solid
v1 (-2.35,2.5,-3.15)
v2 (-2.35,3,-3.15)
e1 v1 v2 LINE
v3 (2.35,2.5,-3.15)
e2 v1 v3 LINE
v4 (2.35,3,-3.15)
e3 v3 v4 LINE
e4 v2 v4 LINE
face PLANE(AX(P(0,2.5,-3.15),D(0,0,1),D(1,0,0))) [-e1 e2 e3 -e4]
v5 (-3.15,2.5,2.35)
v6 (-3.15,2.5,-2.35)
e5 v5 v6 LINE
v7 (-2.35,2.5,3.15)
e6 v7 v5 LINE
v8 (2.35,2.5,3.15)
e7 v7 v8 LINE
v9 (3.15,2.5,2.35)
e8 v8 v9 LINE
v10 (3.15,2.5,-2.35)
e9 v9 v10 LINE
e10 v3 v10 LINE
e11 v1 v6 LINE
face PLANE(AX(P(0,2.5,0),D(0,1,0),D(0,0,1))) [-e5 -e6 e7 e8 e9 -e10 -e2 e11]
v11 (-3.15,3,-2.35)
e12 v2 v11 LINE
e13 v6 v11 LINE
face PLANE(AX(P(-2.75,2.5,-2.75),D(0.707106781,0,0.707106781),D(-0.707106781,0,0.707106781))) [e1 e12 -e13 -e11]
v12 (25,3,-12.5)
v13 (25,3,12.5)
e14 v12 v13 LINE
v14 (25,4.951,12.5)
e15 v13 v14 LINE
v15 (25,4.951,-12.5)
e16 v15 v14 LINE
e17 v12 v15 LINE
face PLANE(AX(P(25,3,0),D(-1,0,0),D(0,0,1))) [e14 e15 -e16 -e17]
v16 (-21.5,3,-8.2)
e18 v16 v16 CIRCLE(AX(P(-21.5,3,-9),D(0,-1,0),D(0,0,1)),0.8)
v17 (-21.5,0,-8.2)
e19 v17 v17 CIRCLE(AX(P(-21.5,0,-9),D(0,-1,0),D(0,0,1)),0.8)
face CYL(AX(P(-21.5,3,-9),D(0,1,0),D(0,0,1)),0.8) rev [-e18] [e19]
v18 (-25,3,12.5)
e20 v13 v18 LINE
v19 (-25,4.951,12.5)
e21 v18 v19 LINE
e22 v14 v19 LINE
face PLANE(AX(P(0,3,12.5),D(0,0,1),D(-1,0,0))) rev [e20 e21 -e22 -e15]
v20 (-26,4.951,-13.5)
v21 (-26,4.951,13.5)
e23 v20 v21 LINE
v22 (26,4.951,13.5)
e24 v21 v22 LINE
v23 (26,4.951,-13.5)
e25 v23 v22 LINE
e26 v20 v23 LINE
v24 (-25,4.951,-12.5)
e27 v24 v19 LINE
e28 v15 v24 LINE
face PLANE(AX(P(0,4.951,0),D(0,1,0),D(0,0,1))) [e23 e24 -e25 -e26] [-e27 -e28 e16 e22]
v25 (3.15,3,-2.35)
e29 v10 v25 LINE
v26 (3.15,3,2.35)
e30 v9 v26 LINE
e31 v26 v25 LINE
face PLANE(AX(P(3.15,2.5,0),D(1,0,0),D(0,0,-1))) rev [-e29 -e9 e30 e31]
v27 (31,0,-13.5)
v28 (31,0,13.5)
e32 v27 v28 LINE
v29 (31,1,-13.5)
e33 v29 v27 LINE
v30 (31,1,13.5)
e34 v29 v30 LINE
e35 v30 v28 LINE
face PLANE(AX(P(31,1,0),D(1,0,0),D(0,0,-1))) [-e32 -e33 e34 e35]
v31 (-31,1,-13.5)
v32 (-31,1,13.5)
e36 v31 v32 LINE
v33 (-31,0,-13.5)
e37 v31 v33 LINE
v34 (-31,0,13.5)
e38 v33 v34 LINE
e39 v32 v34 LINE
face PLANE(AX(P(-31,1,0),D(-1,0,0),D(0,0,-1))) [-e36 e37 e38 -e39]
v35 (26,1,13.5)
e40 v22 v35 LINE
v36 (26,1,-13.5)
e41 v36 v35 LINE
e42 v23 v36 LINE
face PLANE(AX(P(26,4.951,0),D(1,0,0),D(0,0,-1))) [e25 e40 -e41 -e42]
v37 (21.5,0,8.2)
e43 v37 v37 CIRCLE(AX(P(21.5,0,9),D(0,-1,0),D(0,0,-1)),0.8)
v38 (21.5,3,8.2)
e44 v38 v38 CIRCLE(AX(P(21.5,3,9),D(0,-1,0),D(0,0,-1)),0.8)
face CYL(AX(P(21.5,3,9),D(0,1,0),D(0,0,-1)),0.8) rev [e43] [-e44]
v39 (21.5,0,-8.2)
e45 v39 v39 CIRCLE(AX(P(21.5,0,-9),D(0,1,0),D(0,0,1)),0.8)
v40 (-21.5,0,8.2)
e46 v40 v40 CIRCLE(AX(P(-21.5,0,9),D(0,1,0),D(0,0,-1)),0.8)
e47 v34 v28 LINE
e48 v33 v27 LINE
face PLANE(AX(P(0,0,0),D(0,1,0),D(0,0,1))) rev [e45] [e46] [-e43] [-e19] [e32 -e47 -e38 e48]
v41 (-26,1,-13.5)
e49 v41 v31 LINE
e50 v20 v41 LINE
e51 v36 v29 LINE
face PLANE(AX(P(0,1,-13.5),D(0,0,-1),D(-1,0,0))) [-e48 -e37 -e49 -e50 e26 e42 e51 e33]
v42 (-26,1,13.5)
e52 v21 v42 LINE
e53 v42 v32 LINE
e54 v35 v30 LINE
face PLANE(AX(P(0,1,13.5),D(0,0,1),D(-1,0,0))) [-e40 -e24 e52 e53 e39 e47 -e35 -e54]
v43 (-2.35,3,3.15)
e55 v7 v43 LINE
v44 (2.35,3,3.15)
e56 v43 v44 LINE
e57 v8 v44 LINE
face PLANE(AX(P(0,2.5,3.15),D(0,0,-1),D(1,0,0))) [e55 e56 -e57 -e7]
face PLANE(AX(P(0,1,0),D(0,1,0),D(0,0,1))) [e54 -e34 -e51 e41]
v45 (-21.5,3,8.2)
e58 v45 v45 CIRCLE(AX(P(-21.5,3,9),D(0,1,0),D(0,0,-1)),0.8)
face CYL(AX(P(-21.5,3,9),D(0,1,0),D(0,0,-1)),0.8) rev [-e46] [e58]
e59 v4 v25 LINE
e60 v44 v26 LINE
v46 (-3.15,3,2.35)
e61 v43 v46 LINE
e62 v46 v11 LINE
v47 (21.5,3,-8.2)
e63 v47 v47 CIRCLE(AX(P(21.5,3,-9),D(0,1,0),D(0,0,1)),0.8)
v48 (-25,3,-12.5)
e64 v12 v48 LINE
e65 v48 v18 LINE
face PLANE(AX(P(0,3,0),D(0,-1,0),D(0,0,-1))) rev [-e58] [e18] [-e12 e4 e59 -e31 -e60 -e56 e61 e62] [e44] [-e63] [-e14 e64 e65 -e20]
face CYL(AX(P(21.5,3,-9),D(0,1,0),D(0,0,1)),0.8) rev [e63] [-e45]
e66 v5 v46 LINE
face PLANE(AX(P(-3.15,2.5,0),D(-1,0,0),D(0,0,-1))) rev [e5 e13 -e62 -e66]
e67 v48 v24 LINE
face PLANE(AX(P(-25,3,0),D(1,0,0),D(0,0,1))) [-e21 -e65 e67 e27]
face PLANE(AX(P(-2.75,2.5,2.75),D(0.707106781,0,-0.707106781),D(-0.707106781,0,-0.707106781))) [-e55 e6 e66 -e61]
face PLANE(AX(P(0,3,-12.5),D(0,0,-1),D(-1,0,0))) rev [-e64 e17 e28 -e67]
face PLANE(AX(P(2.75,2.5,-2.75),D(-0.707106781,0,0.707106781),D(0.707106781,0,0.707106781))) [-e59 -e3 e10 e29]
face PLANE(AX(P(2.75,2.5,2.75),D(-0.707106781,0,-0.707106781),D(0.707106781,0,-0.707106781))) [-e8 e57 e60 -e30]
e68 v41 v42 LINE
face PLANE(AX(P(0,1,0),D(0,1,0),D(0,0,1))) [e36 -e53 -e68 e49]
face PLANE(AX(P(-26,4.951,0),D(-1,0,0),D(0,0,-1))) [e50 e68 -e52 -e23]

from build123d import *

# Parameters (mm, degrees)
SKETCH2_W           = 5
SKETCH2_H           = 13.5
BOSS_EXTRUDE3_DEPTH = 1
SKETCH2_7_W         = 26
SKETCH2_7_H         = 13.5
BOSS_EXTRUDE6_DEPTH = 4.951
CUT_EXTRUDE2_START  = 4.951
CUT_EXTRUDE2_DEPTH  = 1.951
CUT_EXTRUDE3_START  = 3
CUT_EXTRUDE3_DEPTH  = 0.5
M2_TAPPED_HOLE1_D   = 1.6
BOX_OUTLINE_R       = 0.8
BOX_DEPTH           = 3
BOX_2_OUTLINE_W     = 5
BOX_2_OUTLINE_H     = 13.5
BOX_2_OUTLINE_H_2   = 27
BOX_2_DEPTH         = 1
BOX_START           = 3
BOX_3_DEPTH         = 1.951
BOX_START_2         = 1
BOX_4_DEPTH         = 1.5


# Read off the part's stored shape, not the designer's step: box
with BuildPart() as part:
    # Sketch2 → Boss-Extrude3 (new body)
    with BuildSketch(Plane(origin=(0, 0, 0), x_dir=(1, 0, 0), z_dir=(0, 1, 0))):
        with Locations((28.5, 6.75)):
            Rectangle(SKETCH2_W, SKETCH2_H)
    extrude(amount=BOSS_EXTRUDE3_DEPTH)

    # Sketch2<7> → Boss-Extrude6 (add)
    with BuildSketch(Plane(origin=(0, 0, 0), x_dir=(1, 0, 0), z_dir=(0, 1, 0))):
        with Locations((13, 6.75)):
            Rectangle(SKETCH2_7_W, SKETCH2_7_H)
    extrude(amount=BOSS_EXTRUDE6_DEPTH)

    # Sketch2<9> → Cut-Extrude2 (cut)
    with BuildSketch(Plane(origin=(0, 0, 0), x_dir=(1, 0, 0), z_dir=(0, 1, 0)).offset(CUT_EXTRUDE2_START)):
        Polygon((3.15, 0), (25, 0), (25, 12.5), (0, 12.5), (0, 3.15), (2.35, 3.15), (3.15, 2.35), align=None)
        Polygon((0, 0), (3.15, 0), (3.15, 2.35), (2.35, 3.15), (0, 3.15), align=None)
    extrude(amount=-CUT_EXTRUDE2_DEPTH, mode=Mode.SUBTRACT)

    # Sketch2<12> → Cut-Extrude3 (cut)
    with BuildSketch(Plane(origin=(0, 0, 0), x_dir=(1, 0, 0), z_dir=(0, 1, 0)).offset(CUT_EXTRUDE3_START)):
        Polygon((0, 0), (3.15, 0), (3.15, 2.35), (2.35, 3.15), (0, 3.15), align=None)
    extrude(amount=-CUT_EXTRUDE3_DEPTH, mode=Mode.SUBTRACT)

    # M2 Tapped Hole1 (through all)
    with Locations(Plane(origin=(0, 3, 0), x_dir=(1, 0, 0), z_dir=(0, 1, 0))):
        with Locations((21.5, 9)):
            Hole(M2_TAPPED_HOLE1_D / 2)

    # box outline → box (add)
    with BuildSketch(Plane(origin=(0, 0, 0), x_dir=(1, 0, 0), z_dir=(0, 1, 0))):
        Polygon((-26, -13.5), (26, -13.5), (26, 0), (3.15, 0), (3.15, -2.35), (2.35, -3.15), (-2.35, -3.15), (-3.15, -2.35), (-3.15, 2.35), (-2.35, 3.15), (0, 3.15), (0, 13.5), (-26, 13.5), align=None)
        with Locations((-21.5, -9)):
            Circle(BOX_OUTLINE_R, mode=Mode.SUBTRACT)
        with Locations((21.5, -9)):
            Circle(BOX_OUTLINE_R, mode=Mode.SUBTRACT)
        with Locations((-21.5, 9)):
            Circle(BOX_OUTLINE_R, mode=Mode.SUBTRACT)
    extrude(amount=BOX_DEPTH)

    # box 2 outline → box 2 (add)
    with BuildSketch(Plane(origin=(0, 0, 0), x_dir=(1, 0, 0), z_dir=(0, 1, 0))):
        with Locations((28.5, -6.75)):
            Rectangle(BOX_2_OUTLINE_W, BOX_2_OUTLINE_H)
        with Locations((-28.5, 0)):
            Rectangle(BOX_2_OUTLINE_W, BOX_2_OUTLINE_H_2)
        Polygon((3.15, -2.35), (3.15, 0), (0, 0), (0, 3.15), (-2.35, 3.15), (-3.15, 2.35), (-3.15, -2.35), (-2.35, -3.15), (2.35, -3.15), align=None)
    extrude(amount=BOX_2_DEPTH)

    # box 3 outline → box 3 (add)
    with BuildSketch(Plane(origin=(0, 0, 0), x_dir=(1, 0, 0), z_dir=(0, 1, 0)).offset(BOX_START)):
        Polygon((-26, -13.5), (26, -13.5), (26, 0), (25, 0), (25, -12.5), (-25, -12.5), (-25, 12.5), (0, 12.5), (0, 13.5), (-26, 13.5), align=None)
    extrude(amount=BOX_3_DEPTH)

    # box 4 outline → box 4 (add)
    with BuildSketch(Plane(origin=(0, 0, 0), x_dir=(1, 0, 0), z_dir=(0, 1, 0)).offset(BOX_START_2)):
        Polygon((3.15, -2.35), (3.15, 0), (0, 0), (0, 3.15), (-2.35, 3.15), (-3.15, 2.35), (-3.15, -2.35), (-2.35, -3.15), (2.35, -3.15), align=None)
    extrude(amount=BOX_4_DEPTH)


solid = part.part
